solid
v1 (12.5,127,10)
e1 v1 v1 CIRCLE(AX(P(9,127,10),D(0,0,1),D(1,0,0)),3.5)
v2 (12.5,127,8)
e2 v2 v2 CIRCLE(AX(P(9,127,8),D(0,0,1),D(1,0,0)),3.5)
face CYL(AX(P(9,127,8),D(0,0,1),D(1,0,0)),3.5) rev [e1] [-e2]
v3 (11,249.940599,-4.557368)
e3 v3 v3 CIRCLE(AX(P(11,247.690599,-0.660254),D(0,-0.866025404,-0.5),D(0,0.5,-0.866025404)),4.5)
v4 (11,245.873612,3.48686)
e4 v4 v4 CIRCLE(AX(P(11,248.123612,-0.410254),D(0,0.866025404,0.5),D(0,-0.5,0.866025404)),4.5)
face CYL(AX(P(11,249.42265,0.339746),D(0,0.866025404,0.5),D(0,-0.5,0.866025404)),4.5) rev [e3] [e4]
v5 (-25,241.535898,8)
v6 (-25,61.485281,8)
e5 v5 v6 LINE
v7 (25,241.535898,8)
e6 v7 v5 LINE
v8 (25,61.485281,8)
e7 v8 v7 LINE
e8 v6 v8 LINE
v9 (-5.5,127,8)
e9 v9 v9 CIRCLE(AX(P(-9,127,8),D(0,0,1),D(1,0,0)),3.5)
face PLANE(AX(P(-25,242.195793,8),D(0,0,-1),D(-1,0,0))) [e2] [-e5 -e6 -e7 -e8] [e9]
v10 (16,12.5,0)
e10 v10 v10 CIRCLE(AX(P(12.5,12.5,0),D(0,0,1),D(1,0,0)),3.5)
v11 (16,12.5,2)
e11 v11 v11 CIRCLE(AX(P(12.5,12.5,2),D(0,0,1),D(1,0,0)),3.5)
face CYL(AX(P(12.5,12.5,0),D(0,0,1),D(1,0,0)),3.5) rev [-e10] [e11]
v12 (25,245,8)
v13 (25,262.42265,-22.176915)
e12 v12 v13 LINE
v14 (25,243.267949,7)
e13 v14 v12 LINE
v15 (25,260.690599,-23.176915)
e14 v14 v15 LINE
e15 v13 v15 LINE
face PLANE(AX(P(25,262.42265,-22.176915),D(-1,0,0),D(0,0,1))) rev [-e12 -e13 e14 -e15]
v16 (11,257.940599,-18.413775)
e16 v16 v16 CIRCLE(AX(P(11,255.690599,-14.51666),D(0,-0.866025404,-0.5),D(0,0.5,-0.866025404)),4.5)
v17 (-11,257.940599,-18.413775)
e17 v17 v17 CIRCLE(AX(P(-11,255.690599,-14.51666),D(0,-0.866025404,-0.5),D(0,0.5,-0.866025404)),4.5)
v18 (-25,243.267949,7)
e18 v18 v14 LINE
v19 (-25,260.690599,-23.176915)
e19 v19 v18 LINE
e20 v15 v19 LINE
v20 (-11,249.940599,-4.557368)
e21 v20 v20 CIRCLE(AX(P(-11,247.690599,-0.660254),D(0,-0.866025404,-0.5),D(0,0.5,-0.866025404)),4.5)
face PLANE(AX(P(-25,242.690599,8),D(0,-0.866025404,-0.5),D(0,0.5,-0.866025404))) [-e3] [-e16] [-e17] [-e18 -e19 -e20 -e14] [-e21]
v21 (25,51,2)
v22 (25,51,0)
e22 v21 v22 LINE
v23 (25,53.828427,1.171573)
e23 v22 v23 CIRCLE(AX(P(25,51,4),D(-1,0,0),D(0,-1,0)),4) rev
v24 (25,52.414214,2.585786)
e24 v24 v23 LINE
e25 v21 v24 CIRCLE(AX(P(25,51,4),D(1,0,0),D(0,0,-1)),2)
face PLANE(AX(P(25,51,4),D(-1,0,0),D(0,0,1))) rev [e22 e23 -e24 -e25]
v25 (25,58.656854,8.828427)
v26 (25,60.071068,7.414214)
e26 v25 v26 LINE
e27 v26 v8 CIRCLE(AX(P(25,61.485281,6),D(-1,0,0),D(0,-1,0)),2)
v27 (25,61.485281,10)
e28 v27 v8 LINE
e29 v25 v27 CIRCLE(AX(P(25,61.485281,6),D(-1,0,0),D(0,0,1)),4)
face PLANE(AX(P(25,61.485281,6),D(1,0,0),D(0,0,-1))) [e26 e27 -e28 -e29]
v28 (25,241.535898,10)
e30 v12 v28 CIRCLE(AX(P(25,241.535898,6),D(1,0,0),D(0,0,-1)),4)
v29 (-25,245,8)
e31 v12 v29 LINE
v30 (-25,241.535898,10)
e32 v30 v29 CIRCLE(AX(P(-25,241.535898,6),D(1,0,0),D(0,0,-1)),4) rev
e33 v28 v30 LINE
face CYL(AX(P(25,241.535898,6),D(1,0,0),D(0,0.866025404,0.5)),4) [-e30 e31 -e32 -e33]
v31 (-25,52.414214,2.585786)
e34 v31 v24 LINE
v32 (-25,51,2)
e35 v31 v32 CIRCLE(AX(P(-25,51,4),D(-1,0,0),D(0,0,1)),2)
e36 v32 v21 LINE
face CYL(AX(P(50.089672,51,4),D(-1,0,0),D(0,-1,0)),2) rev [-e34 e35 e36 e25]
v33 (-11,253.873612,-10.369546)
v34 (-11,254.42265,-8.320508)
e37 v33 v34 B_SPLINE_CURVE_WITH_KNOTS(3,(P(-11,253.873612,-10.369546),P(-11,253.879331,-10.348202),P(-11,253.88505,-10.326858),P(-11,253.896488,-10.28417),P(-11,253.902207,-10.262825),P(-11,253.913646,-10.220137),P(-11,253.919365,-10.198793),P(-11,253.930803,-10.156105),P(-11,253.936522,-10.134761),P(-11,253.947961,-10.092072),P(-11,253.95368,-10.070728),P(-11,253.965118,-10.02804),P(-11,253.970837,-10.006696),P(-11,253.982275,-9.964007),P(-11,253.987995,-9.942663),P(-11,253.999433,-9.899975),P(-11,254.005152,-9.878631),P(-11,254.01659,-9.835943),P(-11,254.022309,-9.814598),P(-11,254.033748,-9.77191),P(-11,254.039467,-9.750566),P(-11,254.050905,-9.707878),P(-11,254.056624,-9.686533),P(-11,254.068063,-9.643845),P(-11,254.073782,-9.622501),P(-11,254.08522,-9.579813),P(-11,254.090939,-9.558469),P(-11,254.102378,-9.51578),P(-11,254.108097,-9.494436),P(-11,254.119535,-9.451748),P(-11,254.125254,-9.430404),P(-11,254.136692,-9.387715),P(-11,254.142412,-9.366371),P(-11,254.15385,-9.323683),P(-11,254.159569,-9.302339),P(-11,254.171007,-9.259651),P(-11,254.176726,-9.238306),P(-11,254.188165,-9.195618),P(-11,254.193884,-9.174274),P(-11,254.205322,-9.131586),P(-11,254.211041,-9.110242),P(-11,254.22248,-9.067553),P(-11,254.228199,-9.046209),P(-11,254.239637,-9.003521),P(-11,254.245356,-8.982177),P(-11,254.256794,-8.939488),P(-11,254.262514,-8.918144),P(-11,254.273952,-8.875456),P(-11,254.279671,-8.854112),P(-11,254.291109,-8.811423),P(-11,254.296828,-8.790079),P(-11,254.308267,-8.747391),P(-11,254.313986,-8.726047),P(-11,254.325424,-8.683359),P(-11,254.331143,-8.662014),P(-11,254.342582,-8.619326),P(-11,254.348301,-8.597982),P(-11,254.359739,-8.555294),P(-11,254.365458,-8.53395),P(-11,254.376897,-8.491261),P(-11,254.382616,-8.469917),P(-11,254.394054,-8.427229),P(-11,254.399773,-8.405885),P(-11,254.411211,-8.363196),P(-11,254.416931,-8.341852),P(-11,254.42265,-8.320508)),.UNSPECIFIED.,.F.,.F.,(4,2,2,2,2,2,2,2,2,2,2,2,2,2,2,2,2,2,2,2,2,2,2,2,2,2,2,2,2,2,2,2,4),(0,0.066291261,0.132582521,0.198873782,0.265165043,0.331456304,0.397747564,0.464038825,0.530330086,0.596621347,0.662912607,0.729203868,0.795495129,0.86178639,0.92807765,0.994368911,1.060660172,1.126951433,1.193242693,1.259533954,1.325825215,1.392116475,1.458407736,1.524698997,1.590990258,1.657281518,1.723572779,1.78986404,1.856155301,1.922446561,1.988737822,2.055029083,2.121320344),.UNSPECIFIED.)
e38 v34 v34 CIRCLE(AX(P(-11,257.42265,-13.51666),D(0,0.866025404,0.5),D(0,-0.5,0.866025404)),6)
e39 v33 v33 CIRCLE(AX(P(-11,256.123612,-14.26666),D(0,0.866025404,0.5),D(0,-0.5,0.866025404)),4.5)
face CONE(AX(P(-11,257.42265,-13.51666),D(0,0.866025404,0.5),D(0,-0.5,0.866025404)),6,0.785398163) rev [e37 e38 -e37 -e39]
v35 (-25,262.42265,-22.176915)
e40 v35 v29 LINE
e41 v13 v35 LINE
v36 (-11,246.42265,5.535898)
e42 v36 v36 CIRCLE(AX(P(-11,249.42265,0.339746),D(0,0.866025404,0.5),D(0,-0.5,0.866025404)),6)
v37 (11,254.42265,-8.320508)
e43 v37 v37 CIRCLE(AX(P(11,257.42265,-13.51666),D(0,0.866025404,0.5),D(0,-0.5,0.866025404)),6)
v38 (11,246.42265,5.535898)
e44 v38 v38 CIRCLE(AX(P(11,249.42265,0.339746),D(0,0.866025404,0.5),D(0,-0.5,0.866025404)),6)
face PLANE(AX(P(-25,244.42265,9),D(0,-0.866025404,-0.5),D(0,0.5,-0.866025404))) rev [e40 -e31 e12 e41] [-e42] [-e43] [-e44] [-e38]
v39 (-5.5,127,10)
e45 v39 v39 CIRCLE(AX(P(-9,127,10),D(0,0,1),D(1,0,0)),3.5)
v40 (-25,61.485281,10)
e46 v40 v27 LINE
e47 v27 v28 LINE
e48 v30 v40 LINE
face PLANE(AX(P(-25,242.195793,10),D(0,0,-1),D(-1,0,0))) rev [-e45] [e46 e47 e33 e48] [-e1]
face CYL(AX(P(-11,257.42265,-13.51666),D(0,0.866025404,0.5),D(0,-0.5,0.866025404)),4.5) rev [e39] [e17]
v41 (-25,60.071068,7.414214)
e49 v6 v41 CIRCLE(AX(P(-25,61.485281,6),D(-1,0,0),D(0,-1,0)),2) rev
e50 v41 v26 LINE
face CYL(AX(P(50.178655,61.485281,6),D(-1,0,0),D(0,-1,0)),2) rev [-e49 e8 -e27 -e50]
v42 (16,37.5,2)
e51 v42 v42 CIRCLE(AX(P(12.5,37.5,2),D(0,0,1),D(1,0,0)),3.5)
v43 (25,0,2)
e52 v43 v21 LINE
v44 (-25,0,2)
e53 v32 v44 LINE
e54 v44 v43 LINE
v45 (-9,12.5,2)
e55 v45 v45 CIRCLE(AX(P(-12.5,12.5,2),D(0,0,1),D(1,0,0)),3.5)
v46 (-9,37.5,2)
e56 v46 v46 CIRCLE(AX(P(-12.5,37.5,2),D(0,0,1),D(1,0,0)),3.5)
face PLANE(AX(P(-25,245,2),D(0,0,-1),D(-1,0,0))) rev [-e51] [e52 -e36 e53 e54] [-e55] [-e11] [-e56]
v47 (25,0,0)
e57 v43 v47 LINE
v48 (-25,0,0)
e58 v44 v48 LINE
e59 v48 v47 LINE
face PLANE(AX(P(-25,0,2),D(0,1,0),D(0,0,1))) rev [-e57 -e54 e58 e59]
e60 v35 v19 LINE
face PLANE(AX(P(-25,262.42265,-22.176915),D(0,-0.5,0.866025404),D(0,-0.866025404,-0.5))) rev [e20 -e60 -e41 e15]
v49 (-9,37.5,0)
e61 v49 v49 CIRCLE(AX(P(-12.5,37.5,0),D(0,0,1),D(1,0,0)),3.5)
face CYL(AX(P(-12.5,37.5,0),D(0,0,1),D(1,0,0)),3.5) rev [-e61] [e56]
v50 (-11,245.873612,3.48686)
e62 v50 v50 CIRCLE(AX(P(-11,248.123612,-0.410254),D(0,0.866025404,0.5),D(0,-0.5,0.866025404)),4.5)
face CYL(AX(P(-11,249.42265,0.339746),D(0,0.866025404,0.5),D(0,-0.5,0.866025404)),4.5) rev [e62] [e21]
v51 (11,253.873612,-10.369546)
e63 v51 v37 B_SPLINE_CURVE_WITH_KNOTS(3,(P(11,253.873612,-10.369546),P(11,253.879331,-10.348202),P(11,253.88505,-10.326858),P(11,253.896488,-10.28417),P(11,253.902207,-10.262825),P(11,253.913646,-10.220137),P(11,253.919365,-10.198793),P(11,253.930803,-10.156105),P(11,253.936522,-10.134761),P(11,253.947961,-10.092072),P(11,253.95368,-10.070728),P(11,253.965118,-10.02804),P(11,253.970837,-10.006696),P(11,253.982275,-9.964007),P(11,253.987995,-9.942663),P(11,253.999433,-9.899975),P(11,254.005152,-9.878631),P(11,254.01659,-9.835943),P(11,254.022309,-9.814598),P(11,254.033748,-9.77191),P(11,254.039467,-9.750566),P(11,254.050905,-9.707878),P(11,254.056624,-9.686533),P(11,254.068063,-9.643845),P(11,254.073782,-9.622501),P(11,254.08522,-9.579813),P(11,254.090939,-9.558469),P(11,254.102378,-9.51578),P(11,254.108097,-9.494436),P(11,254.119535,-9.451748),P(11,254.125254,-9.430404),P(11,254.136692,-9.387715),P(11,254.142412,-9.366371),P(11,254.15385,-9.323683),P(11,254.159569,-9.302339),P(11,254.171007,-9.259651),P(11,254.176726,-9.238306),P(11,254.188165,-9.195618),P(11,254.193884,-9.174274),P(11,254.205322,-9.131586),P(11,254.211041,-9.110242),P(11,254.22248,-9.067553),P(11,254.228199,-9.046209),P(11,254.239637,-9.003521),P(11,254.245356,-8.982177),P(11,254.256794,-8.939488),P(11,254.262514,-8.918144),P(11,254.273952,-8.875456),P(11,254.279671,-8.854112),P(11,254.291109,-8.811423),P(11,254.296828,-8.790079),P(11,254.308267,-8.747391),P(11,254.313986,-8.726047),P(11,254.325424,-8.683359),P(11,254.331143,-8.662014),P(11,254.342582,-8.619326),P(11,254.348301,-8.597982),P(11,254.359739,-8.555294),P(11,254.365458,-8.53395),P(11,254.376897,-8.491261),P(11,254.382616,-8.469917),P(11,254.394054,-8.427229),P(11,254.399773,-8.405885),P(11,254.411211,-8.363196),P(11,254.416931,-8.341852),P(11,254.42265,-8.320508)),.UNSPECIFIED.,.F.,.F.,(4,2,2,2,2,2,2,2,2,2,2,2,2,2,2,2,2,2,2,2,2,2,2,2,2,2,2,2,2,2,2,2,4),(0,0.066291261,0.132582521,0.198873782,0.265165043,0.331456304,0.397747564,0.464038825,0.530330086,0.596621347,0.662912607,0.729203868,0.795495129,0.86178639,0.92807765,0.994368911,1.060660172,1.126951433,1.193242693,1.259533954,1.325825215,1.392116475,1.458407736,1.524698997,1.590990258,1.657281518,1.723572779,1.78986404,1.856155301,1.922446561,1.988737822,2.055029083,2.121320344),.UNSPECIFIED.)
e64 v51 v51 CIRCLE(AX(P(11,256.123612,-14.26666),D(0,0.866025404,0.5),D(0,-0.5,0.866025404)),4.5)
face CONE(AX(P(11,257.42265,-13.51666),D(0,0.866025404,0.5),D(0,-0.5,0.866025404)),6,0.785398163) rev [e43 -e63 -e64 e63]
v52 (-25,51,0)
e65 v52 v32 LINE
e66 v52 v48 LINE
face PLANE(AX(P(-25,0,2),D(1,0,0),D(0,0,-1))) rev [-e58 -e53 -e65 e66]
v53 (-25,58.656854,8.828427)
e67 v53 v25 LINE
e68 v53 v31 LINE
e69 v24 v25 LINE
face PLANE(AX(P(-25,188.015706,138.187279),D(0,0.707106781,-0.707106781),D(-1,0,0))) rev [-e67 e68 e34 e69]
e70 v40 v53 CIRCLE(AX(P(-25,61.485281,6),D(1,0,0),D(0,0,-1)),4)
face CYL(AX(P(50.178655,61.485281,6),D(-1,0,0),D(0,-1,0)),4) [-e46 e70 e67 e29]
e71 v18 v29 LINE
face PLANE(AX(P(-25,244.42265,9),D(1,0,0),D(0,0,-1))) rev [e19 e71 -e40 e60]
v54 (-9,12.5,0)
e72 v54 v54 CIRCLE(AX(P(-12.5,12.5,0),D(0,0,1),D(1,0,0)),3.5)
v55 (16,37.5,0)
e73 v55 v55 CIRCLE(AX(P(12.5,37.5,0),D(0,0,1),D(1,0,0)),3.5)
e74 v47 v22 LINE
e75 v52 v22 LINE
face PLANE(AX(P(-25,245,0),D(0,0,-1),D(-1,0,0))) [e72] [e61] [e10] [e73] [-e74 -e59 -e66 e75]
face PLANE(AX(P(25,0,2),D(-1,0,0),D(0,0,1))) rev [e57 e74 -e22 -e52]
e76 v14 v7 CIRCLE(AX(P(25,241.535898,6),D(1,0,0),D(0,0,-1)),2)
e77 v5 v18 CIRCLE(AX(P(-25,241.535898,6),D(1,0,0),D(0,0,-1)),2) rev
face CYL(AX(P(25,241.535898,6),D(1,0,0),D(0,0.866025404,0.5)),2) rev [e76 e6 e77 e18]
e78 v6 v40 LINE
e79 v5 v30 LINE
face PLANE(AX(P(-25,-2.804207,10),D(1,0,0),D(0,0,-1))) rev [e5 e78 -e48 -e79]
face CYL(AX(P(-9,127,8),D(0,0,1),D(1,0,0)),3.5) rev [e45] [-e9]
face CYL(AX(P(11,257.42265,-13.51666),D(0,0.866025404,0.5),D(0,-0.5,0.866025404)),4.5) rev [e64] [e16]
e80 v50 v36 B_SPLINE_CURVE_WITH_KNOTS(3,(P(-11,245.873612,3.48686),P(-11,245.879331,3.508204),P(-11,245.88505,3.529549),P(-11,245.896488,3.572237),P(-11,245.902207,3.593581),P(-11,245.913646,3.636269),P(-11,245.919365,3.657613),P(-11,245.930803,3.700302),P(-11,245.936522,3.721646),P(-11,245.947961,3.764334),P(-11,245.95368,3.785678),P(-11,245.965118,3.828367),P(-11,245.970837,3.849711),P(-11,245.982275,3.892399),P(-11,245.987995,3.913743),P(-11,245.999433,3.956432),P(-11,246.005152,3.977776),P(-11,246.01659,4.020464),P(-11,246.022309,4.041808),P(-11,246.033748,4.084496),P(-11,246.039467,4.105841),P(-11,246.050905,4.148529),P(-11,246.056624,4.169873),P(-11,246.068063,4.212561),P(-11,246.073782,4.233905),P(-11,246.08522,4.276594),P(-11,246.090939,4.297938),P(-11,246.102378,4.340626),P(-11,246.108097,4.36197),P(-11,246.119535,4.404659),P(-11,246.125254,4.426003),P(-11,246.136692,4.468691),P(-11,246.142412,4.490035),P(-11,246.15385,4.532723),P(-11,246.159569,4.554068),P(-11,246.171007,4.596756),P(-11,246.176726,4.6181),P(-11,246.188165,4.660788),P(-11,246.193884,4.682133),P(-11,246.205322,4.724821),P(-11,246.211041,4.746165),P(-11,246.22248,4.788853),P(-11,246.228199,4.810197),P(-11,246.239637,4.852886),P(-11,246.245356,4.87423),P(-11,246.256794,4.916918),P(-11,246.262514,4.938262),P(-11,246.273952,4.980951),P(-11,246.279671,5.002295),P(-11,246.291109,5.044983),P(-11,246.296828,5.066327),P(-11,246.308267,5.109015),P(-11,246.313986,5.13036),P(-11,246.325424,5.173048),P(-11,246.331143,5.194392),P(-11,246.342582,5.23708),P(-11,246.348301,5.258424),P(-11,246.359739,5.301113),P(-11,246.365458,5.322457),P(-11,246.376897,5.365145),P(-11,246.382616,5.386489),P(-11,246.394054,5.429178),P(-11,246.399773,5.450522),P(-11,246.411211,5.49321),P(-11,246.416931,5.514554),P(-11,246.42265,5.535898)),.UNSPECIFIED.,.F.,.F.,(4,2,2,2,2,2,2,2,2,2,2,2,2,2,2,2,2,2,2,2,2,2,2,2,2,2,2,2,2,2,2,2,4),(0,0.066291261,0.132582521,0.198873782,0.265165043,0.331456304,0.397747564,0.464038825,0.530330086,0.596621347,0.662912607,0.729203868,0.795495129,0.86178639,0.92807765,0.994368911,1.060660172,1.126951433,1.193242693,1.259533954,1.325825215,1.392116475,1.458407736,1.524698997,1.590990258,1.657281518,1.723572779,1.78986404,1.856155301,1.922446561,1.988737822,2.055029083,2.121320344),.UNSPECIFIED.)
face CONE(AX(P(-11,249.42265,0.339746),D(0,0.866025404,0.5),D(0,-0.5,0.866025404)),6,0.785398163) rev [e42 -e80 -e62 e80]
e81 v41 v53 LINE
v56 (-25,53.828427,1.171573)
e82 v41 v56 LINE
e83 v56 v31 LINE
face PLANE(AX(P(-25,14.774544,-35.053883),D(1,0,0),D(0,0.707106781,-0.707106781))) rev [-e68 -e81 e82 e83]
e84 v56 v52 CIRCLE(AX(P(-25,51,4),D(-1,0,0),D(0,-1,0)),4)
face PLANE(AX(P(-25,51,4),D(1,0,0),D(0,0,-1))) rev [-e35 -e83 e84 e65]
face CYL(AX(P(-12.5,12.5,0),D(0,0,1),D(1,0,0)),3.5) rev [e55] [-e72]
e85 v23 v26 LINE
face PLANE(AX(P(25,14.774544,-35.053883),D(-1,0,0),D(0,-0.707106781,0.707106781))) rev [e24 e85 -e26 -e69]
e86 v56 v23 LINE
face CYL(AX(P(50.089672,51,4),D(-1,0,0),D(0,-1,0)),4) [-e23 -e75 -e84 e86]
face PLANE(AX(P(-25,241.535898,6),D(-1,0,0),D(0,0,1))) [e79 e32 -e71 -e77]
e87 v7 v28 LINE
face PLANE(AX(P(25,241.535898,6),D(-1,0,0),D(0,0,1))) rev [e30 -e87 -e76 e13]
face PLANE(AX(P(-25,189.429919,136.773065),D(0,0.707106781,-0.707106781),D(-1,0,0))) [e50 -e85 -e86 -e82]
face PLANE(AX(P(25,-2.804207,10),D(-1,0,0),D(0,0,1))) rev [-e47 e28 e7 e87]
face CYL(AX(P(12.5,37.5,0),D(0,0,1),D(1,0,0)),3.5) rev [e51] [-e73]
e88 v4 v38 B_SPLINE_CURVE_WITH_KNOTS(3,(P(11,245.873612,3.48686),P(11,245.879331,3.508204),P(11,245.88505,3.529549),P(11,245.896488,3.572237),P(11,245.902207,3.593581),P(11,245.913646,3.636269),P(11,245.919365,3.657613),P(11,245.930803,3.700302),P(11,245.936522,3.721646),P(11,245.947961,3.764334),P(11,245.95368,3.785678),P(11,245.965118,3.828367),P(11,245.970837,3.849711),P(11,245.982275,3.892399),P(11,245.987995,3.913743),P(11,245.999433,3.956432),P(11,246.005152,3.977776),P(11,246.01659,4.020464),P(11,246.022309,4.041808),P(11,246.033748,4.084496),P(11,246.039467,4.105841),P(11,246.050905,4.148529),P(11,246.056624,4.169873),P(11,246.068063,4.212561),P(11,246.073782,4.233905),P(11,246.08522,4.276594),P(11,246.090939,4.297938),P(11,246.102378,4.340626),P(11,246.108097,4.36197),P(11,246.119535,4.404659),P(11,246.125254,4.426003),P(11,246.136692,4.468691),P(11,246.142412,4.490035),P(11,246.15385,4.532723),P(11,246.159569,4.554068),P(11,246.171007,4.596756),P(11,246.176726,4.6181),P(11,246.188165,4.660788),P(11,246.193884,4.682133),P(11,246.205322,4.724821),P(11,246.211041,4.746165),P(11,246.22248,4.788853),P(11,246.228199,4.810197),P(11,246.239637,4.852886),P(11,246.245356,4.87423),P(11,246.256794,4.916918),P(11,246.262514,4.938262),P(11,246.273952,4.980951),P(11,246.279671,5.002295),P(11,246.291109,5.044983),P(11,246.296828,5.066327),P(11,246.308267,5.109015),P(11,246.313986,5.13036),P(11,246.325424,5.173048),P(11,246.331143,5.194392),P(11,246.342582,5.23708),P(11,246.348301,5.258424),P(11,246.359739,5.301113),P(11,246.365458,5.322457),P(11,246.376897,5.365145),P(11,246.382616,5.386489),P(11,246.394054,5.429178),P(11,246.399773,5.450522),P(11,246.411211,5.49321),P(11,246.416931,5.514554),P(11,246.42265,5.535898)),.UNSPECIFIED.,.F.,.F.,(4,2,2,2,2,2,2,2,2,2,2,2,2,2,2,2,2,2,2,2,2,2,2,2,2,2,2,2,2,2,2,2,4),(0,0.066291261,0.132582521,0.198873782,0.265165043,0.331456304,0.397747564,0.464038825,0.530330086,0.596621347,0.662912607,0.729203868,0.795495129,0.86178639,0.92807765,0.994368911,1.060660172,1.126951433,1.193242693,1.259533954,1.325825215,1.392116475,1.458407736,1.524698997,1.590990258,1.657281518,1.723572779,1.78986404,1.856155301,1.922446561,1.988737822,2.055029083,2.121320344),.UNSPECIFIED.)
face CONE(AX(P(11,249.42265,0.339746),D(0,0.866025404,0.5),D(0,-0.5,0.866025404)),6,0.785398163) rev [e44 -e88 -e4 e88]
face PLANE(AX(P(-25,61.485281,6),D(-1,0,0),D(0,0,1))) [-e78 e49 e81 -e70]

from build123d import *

# Parameters (mm, degrees)
SKETCH_1_W                            = 50
SKETCH_1_H                            = 245
SM_BASE_FLANGE_1_DEPTH                = 2
SM_START                              = -25
SM_EDGE_FLANGE_1_DEPTH                = 50
SM_EDGE_FLANGE_1_2_DEPTH              = 50
OTHER_START                           = -25
OTHER_1_DEPTH                         = 50
OTHER_1_2_DEPTH                       = 50
HOLE_WIZARD_M61_D                     = 9
HOLE_WIZARD_M61_CSINK_D               = 12
HOLE_WIZARD_M61_CSINK_ANGLE           = 90
HOLE_WIZARD_M61_ON_FACE_2_D           = 9
HOLE_WIZARD_M61_ON_FACE_2_CSINK_D     = 12
HOLE_WIZARD_M61_ON_FACE_2_CSINK_ANGLE = 90
HOLE_WIZARD_M61_ON_FACE_3_D           = 9
HOLE_WIZARD_M61_ON_FACE_3_CSINK_D     = 12
HOLE_WIZARD_M61_ON_FACE_3_CSINK_ANGLE = 90
SKETCH_9_R                            = 3.5
CUT_EXTRUDE_1_DEPTH                   = 2
SKETCH_10_R                           = 3.5
CUT_EXTRUDE_2_DEPTH                   = 2


# Read off the part's stored shape, not the designer's step: Ребро-кромка1, Изгиб1
# Sheet-metal steps are written as plain solids
with BuildPart() as part:
    # Sketch 1 → Базовая кромка1 (new body)
    with BuildSketch(Plane.XY):
        with Locations((0, 122.5)):
            Rectangle(SKETCH_1_W, SKETCH_1_H)
    extrude(amount=SM_BASE_FLANGE_1_DEPTH)

    # Ребро-кромка1 outline → Ребро-кромка1 (cut)
    with BuildSketch(Plane.YZ.offset(SM_START)):
        with BuildLine():
            ThreePointArc((241.535898385, 2), (243.535898385, 1.464101615), (245, 0))
            Line((245, 0), (245, 2))
            Line((245, 2), (241.535898385, 2))
        make_face()
    extrude(amount=SM_EDGE_FLANGE_1_DEPTH, mode=Mode.SUBTRACT)

    # Sm Edge Flange 1 2 outline → Sm Edge Flange 1 2 (add)
    with BuildSketch(Plane.YZ.offset(SM_START)):
        with BuildLine():
            Line((262.422649731, -30.176914536), (245, 0))
            Line((245, 0), (241.535898385, 0))
            ThreePointArc((241.535898385, 0), (242.535898385, -0.267949192), (243.267949192, -1))
            Line((243.267949192, -1), (260.690598923, -31.176914536))
            Line((260.690598923, -31.176914536), (262.422649731, -30.176914536))
        make_face()
    extrude(amount=SM_EDGE_FLANGE_1_2_DEPTH)

    # Other 1 outline → Other 1 (cut)
    with BuildSketch(Plane.YZ.offset(OTHER_START)):
        with BuildLine():
            Line((241.535898385, 2), (54.65685425, 2))
            Line((54.65685425, 2), (53.82842715, 1.17157285))
            ThreePointArc((53.82842715, 1.17157285), (52.530733743, 0.304481837), (51, -3.6e-08))
            Line((51, -3.6e-08), (241.535898385, 0))
            ThreePointArc((241.535898385, 0), (242.535898385, -0.267949192), (243.267949192, -1))
            Line((243.267949192, -1), (260.690598923, -31.176914536))
            Line((260.690598923, -31.176914536), (262.422649731, -30.176914536))
            Line((262.422649731, -30.176914536), (245, 0))
            ThreePointArc((245, 0), (243.535898385, 1.464101615), (241.535898385, 2))
        make_face()
    extrude(amount=OTHER_1_DEPTH, mode=Mode.SUBTRACT)

    # Other 1 2 outline → Other 1 2 (add)
    with BuildSketch(Plane.YZ.offset(OTHER_START)):
        with BuildLine():
            Line((241.535898385, 10), (61.485281398, 10.000000033))
            ThreePointArc((61.485281398, 10.000000033), (59.954547643, 9.695518165), (58.656854226, 8.828427148))
            Line((58.656854226, 8.828427148), (52.414213588, 2.585786412))
            ThreePointArc((52.414213588, 2.585786412), (51.765366878, 2.152240902), (51, 1.999999964))
            Line((51, 1.999999964), (54.65685425, 2))
            Line((54.65685425, 2), (60.071067788, 7.414213586))
            ThreePointArc((60.071067788, 7.414213586), (60.719914496, 7.847759096), (61.485281374, 8.000000033))
            Line((61.485281374, 8.000000033), (241.535898385, 8))
            ThreePointArc((241.535898385, 8), (242.535898385, 7.732050808), (243.267949192, 7))
            Line((243.267949192, 7), (260.690598923, -23.176914536))
            Line((260.690598923, -23.176914536), (262.422649731, -22.176914536))
            Line((262.422649731, -22.176914536), (245, 8))
            ThreePointArc((245, 8), (243.535898385, 9.464101615), (241.535898385, 10))
        make_face()
    extrude(amount=OTHER_1_2_DEPTH)

    # Зенковка для винта с потайной головкой M61 (through all)
    with Locations(Plane(origin=(-11, 257.422649731, -13.516660498), x_dir=(0, -0.5, 0.866025403784), z_dir=(0, 0.866025403784, 0.5))):
        with Locations((0, 0)):
            CounterSinkHole(HOLE_WIZARD_M61_D / 2, HOLE_WIZARD_M61_CSINK_D / 2, counter_sink_angle=HOLE_WIZARD_M61_CSINK_ANGLE)

    # Зенковка для винта с потайной головкой M61 on face 2 (through all)
    with Locations(Plane(origin=(11, 257.422649731, -13.516660498), x_dir=(0, -0.500000174844, 0.866025302838), z_dir=(0, 0.866025302838, 0.500000174844))):
        with Locations((0, 0)):
            CounterSinkHole(HOLE_WIZARD_M61_ON_FACE_2_D / 2, HOLE_WIZARD_M61_ON_FACE_2_CSINK_D / 2, counter_sink_angle=HOLE_WIZARD_M61_ON_FACE_2_CSINK_ANGLE)

    # Зенковка для винта с потайной головкой M61 on face 3 (through all)
    with Locations(Plane(origin=(11, 249.422649731, 0.339745962), x_dir=(0, -0.500000174844, 0.866025302838), z_dir=(0, 0.866025302838, 0.500000174844))):
        with Locations((0, 0), (0, -22)):
            CounterSinkHole(HOLE_WIZARD_M61_ON_FACE_3_D / 2, HOLE_WIZARD_M61_ON_FACE_3_CSINK_D / 2, counter_sink_angle=HOLE_WIZARD_M61_ON_FACE_3_CSINK_ANGLE)

    # Эскиз9 → Вытянуть1 (cut)
    with BuildSketch(Plane.XY.offset(2)):
        with Locations((-12.5, 37.5)):
            Circle(SKETCH_9_R)
        with Locations((-12.5, 12.5)):
            Circle(SKETCH_9_R)
        with Locations((12.5, 12.5)):
            Circle(SKETCH_9_R)
        with Locations((12.5, 37.5)):
            Circle(SKETCH_9_R)
    extrude(amount=-CUT_EXTRUDE_1_DEPTH, mode=Mode.SUBTRACT)

    # Эскиз10 → Вытянуть2 (cut)
    with BuildSketch(Plane.XY.offset(10)):
        with Locations((-9, 127)):
            Circle(SKETCH_10_R)
        with Locations((9, 127)):
            Circle(SKETCH_10_R)
    extrude(amount=-CUT_EXTRUDE_2_DEPTH, mode=Mode.SUBTRACT)


solid = part.part
